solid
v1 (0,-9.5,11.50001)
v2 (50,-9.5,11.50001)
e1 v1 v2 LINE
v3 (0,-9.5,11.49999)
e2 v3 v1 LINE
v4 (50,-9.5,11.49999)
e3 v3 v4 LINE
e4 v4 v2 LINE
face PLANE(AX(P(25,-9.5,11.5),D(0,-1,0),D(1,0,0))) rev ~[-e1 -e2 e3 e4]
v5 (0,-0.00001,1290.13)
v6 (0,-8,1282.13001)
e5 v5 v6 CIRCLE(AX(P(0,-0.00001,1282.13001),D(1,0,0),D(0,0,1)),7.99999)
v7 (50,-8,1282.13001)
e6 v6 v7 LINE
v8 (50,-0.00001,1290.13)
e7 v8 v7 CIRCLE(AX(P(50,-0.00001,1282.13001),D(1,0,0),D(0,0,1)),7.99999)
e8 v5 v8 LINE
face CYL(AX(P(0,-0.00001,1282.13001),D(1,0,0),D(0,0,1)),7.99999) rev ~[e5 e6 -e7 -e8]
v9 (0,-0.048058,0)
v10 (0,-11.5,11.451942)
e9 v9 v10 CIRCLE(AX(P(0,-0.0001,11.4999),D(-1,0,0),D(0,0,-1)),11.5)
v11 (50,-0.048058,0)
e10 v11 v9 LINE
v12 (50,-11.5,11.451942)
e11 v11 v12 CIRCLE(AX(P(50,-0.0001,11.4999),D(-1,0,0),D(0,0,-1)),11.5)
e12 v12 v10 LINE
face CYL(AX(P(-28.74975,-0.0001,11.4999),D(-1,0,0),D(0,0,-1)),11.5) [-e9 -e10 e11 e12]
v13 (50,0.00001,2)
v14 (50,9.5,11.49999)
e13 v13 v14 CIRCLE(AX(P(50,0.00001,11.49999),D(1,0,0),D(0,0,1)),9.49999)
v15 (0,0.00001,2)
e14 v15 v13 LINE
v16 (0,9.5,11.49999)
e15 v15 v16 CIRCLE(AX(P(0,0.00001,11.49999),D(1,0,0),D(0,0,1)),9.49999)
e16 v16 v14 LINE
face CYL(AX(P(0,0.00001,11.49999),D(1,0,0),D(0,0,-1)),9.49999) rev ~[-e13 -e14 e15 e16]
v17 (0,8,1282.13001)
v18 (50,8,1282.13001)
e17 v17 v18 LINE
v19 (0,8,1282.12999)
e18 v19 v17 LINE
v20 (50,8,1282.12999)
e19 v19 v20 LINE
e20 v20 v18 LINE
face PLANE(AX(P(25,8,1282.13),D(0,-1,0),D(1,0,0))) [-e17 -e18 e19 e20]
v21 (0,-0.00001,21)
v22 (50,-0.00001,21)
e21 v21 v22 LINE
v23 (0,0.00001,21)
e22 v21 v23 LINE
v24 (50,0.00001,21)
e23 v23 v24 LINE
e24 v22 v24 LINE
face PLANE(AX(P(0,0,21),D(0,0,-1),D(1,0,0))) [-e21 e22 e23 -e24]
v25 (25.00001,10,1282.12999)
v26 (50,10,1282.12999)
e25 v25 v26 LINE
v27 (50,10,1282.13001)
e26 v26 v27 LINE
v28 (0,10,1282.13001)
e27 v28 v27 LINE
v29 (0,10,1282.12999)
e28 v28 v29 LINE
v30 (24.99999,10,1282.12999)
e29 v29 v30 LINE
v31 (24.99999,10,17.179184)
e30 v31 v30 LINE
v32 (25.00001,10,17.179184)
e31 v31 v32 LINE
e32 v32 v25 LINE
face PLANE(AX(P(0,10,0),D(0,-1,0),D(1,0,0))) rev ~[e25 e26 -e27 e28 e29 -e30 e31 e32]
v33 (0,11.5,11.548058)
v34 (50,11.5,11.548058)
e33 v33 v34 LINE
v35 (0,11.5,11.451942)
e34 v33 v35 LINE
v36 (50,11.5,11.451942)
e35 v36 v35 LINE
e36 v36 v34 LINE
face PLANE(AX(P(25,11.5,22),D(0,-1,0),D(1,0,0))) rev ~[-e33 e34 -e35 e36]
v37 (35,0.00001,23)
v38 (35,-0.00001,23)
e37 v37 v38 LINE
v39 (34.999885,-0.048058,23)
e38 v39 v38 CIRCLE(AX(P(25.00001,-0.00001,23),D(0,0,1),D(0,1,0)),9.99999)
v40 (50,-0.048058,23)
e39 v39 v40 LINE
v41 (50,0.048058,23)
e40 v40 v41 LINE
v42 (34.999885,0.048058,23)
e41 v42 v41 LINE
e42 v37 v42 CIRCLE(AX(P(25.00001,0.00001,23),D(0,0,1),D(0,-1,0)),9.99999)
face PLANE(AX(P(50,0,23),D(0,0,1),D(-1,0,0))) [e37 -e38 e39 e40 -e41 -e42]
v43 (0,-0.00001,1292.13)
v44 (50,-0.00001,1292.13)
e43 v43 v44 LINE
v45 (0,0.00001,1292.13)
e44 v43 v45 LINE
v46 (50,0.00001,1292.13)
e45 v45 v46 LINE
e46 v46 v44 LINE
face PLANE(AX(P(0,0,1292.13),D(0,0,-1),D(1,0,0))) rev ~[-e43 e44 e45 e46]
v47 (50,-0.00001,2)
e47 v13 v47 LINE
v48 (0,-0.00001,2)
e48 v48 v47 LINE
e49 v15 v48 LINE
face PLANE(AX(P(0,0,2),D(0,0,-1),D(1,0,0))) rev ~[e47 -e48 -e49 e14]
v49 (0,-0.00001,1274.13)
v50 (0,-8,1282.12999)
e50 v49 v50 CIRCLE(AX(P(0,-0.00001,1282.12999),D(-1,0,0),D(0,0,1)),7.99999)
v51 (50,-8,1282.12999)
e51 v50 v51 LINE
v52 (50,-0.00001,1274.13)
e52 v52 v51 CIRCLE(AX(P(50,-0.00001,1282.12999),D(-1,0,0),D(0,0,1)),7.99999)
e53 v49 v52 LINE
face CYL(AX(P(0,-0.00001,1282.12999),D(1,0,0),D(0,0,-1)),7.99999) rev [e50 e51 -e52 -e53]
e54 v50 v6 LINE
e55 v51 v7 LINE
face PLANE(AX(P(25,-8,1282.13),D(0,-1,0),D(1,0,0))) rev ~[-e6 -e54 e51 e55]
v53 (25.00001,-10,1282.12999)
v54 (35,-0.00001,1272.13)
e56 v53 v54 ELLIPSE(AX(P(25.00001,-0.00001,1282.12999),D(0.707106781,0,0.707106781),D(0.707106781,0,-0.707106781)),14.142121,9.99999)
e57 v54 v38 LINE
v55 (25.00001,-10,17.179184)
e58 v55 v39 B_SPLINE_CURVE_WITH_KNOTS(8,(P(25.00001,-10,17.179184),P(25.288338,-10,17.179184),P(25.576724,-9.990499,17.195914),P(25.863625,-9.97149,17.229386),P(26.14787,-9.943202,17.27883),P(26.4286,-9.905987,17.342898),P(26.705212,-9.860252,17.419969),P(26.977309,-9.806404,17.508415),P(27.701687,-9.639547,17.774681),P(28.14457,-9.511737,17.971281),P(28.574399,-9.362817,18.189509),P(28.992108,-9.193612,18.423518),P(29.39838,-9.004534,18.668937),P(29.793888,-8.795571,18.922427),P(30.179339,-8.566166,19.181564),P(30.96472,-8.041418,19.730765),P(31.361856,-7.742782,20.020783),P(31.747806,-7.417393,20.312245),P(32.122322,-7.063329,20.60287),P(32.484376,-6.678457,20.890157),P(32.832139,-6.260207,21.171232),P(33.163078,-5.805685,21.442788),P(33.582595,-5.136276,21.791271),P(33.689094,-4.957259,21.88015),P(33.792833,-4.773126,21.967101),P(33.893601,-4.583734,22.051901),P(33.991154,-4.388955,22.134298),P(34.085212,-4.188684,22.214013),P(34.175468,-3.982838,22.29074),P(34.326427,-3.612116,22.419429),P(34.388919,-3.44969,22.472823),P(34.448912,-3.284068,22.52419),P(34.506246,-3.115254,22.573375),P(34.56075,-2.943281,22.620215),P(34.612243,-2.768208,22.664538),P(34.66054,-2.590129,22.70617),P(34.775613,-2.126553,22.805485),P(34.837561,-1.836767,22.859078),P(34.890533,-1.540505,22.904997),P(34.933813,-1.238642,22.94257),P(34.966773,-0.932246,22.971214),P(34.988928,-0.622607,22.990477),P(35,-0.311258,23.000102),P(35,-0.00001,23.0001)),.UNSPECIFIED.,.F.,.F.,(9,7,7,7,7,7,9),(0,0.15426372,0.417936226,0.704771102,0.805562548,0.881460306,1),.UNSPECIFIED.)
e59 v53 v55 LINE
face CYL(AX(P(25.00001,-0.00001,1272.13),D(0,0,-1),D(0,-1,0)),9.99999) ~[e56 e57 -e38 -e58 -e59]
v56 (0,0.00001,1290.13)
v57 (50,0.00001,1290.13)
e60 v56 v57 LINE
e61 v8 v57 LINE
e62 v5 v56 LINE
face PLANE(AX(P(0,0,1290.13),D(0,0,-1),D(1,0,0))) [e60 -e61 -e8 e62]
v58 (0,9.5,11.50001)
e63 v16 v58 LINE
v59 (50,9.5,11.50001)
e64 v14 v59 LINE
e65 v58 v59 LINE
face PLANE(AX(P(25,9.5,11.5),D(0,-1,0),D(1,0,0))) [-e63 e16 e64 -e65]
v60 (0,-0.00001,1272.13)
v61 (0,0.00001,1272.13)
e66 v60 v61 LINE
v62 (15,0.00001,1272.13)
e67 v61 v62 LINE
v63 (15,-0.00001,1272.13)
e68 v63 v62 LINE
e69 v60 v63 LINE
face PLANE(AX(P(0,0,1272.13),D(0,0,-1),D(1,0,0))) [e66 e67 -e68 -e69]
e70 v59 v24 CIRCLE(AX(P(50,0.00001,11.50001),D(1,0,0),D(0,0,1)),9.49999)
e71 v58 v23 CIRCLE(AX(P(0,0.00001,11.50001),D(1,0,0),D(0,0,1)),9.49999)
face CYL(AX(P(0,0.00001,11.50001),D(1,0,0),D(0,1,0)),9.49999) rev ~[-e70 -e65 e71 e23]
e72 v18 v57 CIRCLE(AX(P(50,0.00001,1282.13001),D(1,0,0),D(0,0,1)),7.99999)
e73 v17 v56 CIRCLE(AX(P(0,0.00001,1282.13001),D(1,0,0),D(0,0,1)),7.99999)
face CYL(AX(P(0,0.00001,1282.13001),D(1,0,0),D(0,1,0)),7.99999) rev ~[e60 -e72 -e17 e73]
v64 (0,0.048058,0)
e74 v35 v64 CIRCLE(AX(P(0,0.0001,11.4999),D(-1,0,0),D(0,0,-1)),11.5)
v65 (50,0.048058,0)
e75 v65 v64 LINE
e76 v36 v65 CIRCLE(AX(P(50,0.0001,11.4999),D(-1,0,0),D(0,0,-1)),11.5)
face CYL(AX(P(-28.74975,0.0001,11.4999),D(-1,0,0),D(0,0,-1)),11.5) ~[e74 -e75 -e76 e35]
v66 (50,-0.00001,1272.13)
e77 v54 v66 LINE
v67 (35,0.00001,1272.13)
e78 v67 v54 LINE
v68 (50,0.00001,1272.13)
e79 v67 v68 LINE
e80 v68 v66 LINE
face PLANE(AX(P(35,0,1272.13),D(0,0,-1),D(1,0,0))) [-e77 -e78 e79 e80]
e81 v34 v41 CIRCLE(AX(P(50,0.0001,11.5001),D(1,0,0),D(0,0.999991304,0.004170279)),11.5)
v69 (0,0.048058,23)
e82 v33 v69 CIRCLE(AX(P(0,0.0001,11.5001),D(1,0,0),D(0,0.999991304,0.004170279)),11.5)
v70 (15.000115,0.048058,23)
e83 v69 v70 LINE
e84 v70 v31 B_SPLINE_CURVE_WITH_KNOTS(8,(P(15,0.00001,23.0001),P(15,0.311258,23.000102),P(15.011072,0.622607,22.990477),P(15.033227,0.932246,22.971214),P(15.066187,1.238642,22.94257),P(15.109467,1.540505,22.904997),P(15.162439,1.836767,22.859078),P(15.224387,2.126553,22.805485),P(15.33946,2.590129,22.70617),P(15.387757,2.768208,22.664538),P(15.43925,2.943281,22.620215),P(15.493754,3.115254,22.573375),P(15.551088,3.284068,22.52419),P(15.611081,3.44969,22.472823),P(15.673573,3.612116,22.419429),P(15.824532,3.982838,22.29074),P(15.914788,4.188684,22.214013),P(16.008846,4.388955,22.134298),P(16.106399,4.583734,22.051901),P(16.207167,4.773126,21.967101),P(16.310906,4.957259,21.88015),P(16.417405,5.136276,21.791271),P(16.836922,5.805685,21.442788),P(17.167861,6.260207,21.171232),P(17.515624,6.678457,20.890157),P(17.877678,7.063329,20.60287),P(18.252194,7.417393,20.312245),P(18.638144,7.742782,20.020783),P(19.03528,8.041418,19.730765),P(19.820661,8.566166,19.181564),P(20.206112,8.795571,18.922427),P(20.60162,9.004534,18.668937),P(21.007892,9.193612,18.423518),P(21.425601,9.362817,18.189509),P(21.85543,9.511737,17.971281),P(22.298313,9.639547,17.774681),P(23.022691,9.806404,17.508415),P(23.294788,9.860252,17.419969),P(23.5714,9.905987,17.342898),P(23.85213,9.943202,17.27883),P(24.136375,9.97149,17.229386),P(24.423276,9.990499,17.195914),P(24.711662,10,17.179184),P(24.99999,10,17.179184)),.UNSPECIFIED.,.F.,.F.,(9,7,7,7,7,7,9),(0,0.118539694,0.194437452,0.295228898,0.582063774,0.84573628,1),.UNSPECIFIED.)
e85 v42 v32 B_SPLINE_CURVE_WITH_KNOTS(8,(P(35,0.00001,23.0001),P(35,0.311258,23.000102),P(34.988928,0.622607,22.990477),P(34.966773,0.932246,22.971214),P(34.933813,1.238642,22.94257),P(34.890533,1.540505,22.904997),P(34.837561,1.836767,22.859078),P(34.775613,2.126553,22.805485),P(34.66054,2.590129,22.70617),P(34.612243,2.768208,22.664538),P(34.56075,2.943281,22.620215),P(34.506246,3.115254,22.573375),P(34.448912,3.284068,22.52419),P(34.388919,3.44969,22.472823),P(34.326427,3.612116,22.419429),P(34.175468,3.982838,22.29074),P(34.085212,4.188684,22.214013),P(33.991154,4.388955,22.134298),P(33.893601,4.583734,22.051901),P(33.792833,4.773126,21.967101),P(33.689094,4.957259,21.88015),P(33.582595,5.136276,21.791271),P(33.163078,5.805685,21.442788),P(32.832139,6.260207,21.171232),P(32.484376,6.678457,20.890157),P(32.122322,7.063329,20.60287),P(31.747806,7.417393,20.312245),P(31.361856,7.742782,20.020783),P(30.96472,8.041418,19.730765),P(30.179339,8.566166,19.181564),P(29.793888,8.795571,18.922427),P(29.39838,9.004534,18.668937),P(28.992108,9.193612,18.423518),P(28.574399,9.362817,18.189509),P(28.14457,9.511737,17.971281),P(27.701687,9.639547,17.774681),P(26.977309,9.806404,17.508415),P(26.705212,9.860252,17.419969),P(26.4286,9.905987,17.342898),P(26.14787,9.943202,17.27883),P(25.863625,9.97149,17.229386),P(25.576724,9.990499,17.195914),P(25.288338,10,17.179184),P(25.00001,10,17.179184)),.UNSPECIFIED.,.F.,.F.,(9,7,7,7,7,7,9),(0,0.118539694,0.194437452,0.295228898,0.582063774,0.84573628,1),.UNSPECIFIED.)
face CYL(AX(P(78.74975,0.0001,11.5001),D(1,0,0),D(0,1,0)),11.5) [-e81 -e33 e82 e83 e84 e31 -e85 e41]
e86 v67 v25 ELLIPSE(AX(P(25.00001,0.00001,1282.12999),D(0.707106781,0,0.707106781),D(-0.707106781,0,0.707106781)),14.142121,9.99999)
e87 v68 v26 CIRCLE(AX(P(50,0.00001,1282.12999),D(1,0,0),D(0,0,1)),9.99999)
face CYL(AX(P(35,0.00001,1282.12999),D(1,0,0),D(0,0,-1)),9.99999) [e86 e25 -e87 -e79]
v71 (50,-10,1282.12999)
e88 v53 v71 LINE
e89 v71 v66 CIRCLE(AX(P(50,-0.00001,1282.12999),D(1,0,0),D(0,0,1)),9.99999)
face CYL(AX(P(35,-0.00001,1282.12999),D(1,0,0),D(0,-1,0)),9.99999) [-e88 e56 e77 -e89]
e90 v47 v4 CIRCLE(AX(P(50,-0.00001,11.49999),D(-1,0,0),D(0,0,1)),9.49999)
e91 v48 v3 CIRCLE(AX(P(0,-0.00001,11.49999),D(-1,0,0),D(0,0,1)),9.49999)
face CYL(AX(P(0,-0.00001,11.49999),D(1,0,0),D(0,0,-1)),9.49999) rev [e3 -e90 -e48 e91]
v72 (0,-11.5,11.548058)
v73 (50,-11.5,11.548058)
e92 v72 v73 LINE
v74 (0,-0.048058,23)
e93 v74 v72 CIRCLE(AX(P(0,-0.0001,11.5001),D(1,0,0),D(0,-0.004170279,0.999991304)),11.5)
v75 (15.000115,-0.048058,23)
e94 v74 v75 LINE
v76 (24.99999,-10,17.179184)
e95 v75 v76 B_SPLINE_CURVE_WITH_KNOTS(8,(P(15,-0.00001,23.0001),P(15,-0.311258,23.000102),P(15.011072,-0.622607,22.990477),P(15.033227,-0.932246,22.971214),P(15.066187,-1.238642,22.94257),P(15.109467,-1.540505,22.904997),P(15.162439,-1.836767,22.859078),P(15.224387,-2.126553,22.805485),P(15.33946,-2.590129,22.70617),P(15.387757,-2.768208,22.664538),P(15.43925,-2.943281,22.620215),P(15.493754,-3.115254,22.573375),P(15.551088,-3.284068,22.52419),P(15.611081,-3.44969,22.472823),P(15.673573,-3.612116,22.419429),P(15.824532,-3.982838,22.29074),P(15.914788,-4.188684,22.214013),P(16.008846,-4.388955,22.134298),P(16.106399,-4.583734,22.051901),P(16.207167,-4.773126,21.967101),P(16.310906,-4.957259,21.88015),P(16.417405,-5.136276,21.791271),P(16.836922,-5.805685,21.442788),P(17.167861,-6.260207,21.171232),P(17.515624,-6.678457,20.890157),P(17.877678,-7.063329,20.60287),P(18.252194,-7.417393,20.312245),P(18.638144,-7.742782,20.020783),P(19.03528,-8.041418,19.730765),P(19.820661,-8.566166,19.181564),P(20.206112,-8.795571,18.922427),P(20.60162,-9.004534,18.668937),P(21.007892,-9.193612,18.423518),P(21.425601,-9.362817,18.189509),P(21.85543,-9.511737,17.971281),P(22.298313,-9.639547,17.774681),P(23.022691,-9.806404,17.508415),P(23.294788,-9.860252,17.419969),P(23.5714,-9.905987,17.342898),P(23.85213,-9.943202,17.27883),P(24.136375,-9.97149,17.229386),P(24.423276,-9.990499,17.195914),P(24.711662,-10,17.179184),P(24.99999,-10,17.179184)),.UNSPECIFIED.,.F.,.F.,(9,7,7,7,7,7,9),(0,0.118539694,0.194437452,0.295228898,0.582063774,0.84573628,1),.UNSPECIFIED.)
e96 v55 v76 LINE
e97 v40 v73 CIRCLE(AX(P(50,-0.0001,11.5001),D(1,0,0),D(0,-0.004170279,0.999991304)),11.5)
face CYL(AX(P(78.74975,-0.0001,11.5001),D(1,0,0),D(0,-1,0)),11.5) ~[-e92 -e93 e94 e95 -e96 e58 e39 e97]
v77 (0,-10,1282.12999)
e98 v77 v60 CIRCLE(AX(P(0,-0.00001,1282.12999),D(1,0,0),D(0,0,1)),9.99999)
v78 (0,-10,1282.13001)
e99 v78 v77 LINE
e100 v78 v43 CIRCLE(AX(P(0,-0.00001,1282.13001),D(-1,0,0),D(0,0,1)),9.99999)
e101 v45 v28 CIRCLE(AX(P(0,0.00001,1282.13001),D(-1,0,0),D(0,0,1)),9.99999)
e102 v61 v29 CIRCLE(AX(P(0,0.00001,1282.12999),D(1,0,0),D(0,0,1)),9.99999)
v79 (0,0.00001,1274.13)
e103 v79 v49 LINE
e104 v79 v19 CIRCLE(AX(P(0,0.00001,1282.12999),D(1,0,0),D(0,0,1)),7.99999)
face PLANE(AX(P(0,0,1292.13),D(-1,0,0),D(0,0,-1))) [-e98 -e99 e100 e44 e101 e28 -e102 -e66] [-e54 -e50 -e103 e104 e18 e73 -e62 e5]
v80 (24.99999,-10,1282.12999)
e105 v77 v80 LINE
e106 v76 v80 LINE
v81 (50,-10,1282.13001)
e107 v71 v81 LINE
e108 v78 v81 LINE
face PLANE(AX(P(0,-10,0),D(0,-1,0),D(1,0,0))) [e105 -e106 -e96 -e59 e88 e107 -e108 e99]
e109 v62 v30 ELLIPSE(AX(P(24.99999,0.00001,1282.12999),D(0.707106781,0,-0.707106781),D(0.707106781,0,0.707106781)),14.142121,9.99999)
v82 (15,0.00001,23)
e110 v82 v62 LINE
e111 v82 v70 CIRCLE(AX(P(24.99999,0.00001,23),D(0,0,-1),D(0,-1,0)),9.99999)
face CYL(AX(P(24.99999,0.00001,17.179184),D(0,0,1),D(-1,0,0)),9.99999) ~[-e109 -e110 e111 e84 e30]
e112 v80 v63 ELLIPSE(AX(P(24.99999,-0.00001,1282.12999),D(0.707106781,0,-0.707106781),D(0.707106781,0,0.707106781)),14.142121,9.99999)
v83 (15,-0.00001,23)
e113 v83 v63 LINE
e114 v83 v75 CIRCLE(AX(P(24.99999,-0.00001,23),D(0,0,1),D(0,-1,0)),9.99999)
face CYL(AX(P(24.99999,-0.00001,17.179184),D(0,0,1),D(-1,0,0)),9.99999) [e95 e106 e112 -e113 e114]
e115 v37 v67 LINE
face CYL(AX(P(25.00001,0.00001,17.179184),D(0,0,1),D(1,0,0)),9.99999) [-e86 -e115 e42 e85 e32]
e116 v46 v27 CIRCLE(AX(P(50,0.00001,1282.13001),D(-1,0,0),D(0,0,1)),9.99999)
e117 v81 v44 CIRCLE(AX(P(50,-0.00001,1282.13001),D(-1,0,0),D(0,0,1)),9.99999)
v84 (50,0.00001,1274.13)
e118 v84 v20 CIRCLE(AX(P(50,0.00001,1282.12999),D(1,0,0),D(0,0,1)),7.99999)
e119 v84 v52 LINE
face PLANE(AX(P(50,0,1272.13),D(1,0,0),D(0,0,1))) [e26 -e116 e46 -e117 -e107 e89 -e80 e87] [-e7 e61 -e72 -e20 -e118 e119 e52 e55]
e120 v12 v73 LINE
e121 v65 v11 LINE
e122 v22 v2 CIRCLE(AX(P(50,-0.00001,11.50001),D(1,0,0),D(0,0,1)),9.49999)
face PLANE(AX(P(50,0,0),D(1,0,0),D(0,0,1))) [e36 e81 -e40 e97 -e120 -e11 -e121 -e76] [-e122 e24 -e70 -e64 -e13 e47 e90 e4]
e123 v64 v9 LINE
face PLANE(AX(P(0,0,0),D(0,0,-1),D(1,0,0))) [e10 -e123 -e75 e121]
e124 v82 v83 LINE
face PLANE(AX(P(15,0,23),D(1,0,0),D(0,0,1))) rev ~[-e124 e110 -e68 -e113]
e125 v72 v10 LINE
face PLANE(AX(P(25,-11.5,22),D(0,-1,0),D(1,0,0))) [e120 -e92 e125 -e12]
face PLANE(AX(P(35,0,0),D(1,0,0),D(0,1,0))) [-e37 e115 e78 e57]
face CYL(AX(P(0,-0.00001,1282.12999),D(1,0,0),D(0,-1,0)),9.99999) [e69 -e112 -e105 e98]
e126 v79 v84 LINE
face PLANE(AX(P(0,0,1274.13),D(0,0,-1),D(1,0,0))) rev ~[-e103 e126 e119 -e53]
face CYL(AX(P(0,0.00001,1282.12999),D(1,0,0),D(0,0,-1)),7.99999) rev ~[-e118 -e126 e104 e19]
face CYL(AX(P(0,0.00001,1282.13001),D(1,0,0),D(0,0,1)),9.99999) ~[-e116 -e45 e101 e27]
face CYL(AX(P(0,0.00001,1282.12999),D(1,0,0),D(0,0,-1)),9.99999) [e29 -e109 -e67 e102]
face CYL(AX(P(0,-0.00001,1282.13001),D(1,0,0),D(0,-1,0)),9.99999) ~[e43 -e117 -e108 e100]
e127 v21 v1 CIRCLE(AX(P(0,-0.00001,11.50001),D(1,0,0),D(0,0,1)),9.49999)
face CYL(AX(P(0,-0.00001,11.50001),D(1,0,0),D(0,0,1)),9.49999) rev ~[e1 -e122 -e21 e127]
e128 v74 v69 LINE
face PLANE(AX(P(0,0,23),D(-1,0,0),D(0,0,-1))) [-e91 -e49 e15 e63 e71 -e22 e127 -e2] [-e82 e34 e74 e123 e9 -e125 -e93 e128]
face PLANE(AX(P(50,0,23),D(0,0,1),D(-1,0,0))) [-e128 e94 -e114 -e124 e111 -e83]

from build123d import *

# Parameters (mm, degrees)
F0_W         = 20
F0_H         = 1249.13
F0_W_2       = 50
F0_H_2       = 16
F0_H_3       = 2
F1_DEPTH     = 10
F0_H_4       = 19
F2_DEPTH     = 11.5
F3_DEPTH     = 9.5
F4_DEPTH     = 8
F5_R         = 7.99999
F6_R         = 9.49999
F7_T1_DEPTH  = 107.4995000022
F7_T6_DEPTH  = 107.4995000022
F7_T12_DEPTH = 107.4995000022
F7_T18_DEPTH = 107.4995000022
F7_T25_DEPTH = 107.4995000022
F7_T31_DEPTH = 107.4995000022
F7_T37_DEPTH = 107.4995000022
F7_T43_DEPTH = 107.4995000022
F7_T49_DEPTH = 107.4995000022
F7_T56_DEPTH = 107.4995000022
F7_T62_DEPTH = 107.4995000022
F8_R         = 9.99999


# Not quite as in the source:
# - a fillet or chamfer that OpenCascade refuses, or shapes differently, is made with other operations: its cross-section is extruded or revolved along the edge and cut away or added
# - a fillet or chamfer is up to 0.001 mm smaller than in the source, because OpenCascade refuses the exact size


with BuildPart() as f1:
    # F0 (on Front) → F1 (new body, symmetric)
    with BuildSketch(Plane.XZ):
        with Locations((25, 647.565)):
            Rectangle(F0_W, F0_H)
        Polygon((0, 1272.13), (15, 1272.13), (35, 1272.13), (50, 1272.13), (50, 1274.13), (0, 1274.13), align=None)
        with Locations((25, 1282.13)):
            Rectangle(F0_W_2, F0_H_2)
        with Locations((25, 1291.13)):
            Rectangle(F0_W_2, F0_H_3)
    extrude(amount=F1_DEPTH, both=True)

    # F0 (on Front) → F2 (join, symmetric)
    with BuildSketch(Plane.XZ):
        Polygon((0, 23), (0, 21), (50, 21), (50, 23), (35, 23), (15, 23), align=None)
        with Locations((25, 11.5)):
            Rectangle(F0_W_2, F0_H_4)
        with Locations((25, 1)):
            Rectangle(F0_W_2, F0_H_3)
    extrude(amount=F2_DEPTH, both=True)

    # F0 (on Front) → F3 (cut, symmetric)
    with BuildSketch(Plane.XZ):
        with Locations((25, 11.5)):
            Rectangle(F0_W_2, F0_H_4)
    extrude(amount=F3_DEPTH, both=True, mode=Mode.SUBTRACT)

    # F0 (on Front) → F4 (cut, symmetric)
    with BuildSketch(Plane.XZ):
        with Locations((25, 1282.13)):
            Rectangle(F0_W_2, F0_H_2)
    extrude(amount=F4_DEPTH, both=True, mode=Mode.SUBTRACT)

    # F5 (radius 8 in the source; OpenCascade refuses exactly that, so slightly less here)
    f5_edges = [f1.edges().sort_by_distance(p)[0] for p in [
        (25, -8, 1290.13),
        (25, -8, 1274.13),
        (25, 8, 1274.13),
        (25, 8, 1290.13),
    ]]
    fillet(f5_edges, radius=F5_R)

    # F6 (radius 9.5 in the source; OpenCascade refuses exactly that, so slightly less here)
    f6_edges = [f1.edges().sort_by_distance(p)[0] for p in [
        (25, 9.5, 2),
        (25, -9.5, 2),
        (25, -9.5, 21),
        (25, 9.5, 21),
    ]]
    fillet(f6_edges, radius=F6_R)

    # F7: fillet of radius 11.5 on 4 edges, made by hand

    # F7_s2 → F7_t1 (cut)
    with BuildSketch(Plane.YZ.offset(-28.7497500011)):
        with BuildLine():
            ThreePointArc((-0.0001, -0.0001), (-8.1318279836, 3.3681720164), (-11.5001, 11.4999))
            Line((-11.5001, 11.4999), (-11.7301, 11.4999))
            ThreePointArc((-11.7301, 11.4999), (-11.73, 5.74995), (-11.73, 0))
            Line((-11.73, 0), (-11.5, -0.23))
            ThreePointArc((-11.5, -0.23), (-5.75005, -0.23), (-0.0001, -0.2301))
            Line((-0.0001, -0.2301), (-0.0001, -0.0001))
        make_face()
        with BuildLine():
            ThreePointArc((0.0001, -0.0001), (8.1318279836, 3.3681720164), (11.5001, 11.4999))
            Line((11.5001, 11.4999), (11.7301, 11.4999))
            ThreePointArc((11.7301, 11.4999), (11.73, 5.74995), (11.73, 0))
            Line((11.73, 0), (11.5, -0.23))
            ThreePointArc((11.5, -0.23), (5.75005, -0.23), (0.0001, -0.2301))
            Line((0.0001, -0.2301), (0.0001, -0.0001))
        make_face()
    extrude(amount=F7_T1_DEPTH, mode=Mode.SUBTRACT)


with BuildPart() as f7_tool4:
    # F7_s5 → F7_t6 (new body)
    with BuildSketch(Plane.YZ.offset(78.7497500011)):
        with BuildLine():
            ThreePointArc((-11.5001, 11.5001), (-8.1318279836, 19.6318279836), (-0.0001, 23.0001))
            Line((-0.0001, 23.0001), (-0.0001, 23.2301))
            ThreePointArc((-0.0001, 23.2301), (-5.75005, 23.23), (-11.5, 23.23))
            Line((-11.5, 23.23), (-11.73, 23))
            ThreePointArc((-11.73, 23), (-11.73, 17.25005), (-11.7301, 11.5001))
            Line((-11.7301, 11.5001), (-11.5001, 11.5001))
        make_face()
    extrude(amount=-F7_T6_DEPTH)

    split(bisect_by=Plane.XZ.offset(10), keep=Keep.TOP)

    split(bisect_by=Plane.YZ.offset(35), keep=Keep.TOP)


with BuildPart() as f1_1:
    add(f1.part)

    # F7_t3: cut F7_tool4
    add(f7_tool4.part, mode=Mode.SUBTRACT)


with BuildPart() as f7_tool10:
    # F7_s11 → F7_t12 (new body)
    with BuildSketch(Plane.YZ.offset(78.7497500011)):
        with BuildLine():
            ThreePointArc((-11.5001, 11.5001), (-8.1318279836, 19.6318279836), (-0.0001, 23.0001))
            Line((-0.0001, 23.0001), (-0.0001, 23.2301))
            ThreePointArc((-0.0001, 23.2301), (-5.75005, 23.23), (-11.5, 23.23))
            Line((-11.5, 23.23), (-11.73, 23))
            ThreePointArc((-11.73, 23), (-11.73, 17.25005), (-11.7301, 11.5001))
            Line((-11.7301, 11.5001), (-11.5001, 11.5001))
        make_face()
    extrude(amount=-F7_T12_DEPTH)

    split(bisect_by=Plane.XZ.offset(10), keep=Keep.BOTTOM)

    split(bisect_by=Plane.YZ.offset(35), keep=Keep.TOP)


with BuildPart() as f1_2:
    add(f1_1.part)

    # F7_t9: cut F7_tool10
    add(f7_tool10.part, mode=Mode.SUBTRACT)


with BuildPart() as f7_tool16:
    # F7_s17 → F7_t18 (new body)
    with BuildSketch(Plane.YZ.offset(78.7497500011)):
        with BuildLine():
            ThreePointArc((-11.5001, 11.5001), (-8.1318279836, 19.6318279836), (-0.0001, 23.0001))
            Line((-0.0001, 23.0001), (-0.0001, 23.2301))
            ThreePointArc((-0.0001, 23.2301), (-5.75005, 23.23), (-11.5, 23.23))
            Line((-11.5, 23.23), (-11.73, 23))
            ThreePointArc((-11.73, 23), (-11.73, 17.25005), (-11.7301, 11.5001))
            Line((-11.7301, 11.5001), (-11.5001, 11.5001))
        make_face()
    extrude(amount=-F7_T18_DEPTH)

    split(bisect_by=Plane.YZ.offset(15), keep=Keep.TOP)

    split(bisect_by=Plane.XZ.offset(10), keep=Keep.TOP)

    split(bisect_by=Plane.YZ.offset(35), keep=Keep.BOTTOM)


with BuildPart() as f1_3:
    add(f1_2.part)

    # F7_t15: cut F7_tool16
    add(f7_tool16.part, mode=Mode.SUBTRACT)


with BuildPart() as f7_tool23:
    # F7_s24 → F7_t25 (new body)
    with BuildSketch(Plane.YZ.offset(78.7497500011)):
        with BuildLine():
            ThreePointArc((-11.5001, 11.5001), (-8.1318279836, 19.6318279836), (-0.0001, 23.0001))
            Line((-0.0001, 23.0001), (-0.0001, 23.2301))
            ThreePointArc((-0.0001, 23.2301), (-5.75005, 23.23), (-11.5, 23.23))
            Line((-11.5, 23.23), (-11.73, 23))
            ThreePointArc((-11.73, 23), (-11.73, 17.25005), (-11.7301, 11.5001))
            Line((-11.7301, 11.5001), (-11.5001, 11.5001))
        make_face()
    extrude(amount=-F7_T25_DEPTH)

    split(bisect_by=Plane.YZ.offset(15), keep=Keep.BOTTOM)

    split(bisect_by=Plane.XZ.offset(10), keep=Keep.TOP)


with BuildPart() as f1_4:
    add(f1_3.part)

    # F7_t22: cut F7_tool23
    add(f7_tool23.part, mode=Mode.SUBTRACT)


with BuildPart() as f7_tool29:
    # F7_s30 → F7_t31 (new body)
    with BuildSketch(Plane.YZ.offset(78.7497500011)):
        with BuildLine():
            ThreePointArc((-11.5001, 11.5001), (-8.1318279836, 19.6318279836), (-0.0001, 23.0001))
            Line((-0.0001, 23.0001), (-0.0001, 23.2301))
            ThreePointArc((-0.0001, 23.2301), (-5.75005, 23.23), (-11.5, 23.23))
            Line((-11.5, 23.23), (-11.73, 23))
            ThreePointArc((-11.73, 23), (-11.73, 17.25005), (-11.7301, 11.5001))
            Line((-11.7301, 11.5001), (-11.5001, 11.5001))
        make_face()
    extrude(amount=-F7_T31_DEPTH)

    split(bisect_by=Plane.YZ.offset(15), keep=Keep.BOTTOM)

    split(bisect_by=Plane.XZ.offset(10), keep=Keep.BOTTOM)


with BuildPart() as f1_5:
    add(f1_4.part)

    # F7_t28: cut F7_tool29
    add(f7_tool29.part, mode=Mode.SUBTRACT)


with BuildPart() as f7_tool35:
    # F7_s36 → F7_t37 (new body)
    with BuildSketch(Plane.YZ.offset(78.7497500011)):
        with BuildLine():
            ThreePointArc((11.5001, 11.5001), (8.1318279836, 19.6318279836), (0.0001, 23.0001))
            Line((0.0001, 23.0001), (0.0001, 23.2301))
            ThreePointArc((0.0001, 23.2301), (5.75005, 23.23), (11.5, 23.23))
            Line((11.5, 23.23), (11.73, 23))
            ThreePointArc((11.73, 23), (11.73, 17.25005), (11.7301, 11.5001))
            Line((11.7301, 11.5001), (11.5001, 11.5001))
        make_face()
    extrude(amount=-F7_T37_DEPTH)

    split(bisect_by=Plane.YZ.offset(35), keep=Keep.TOP)

    split(bisect_by=Plane.XZ.offset(-10), keep=Keep.BOTTOM)


with BuildPart() as f1_6:
    add(f1_5.part)

    # F7_t34: cut F7_tool35
    add(f7_tool35.part, mode=Mode.SUBTRACT)


with BuildPart() as f7_tool41:
    # F7_s42 → F7_t43 (new body)
    with BuildSketch(Plane.YZ.offset(78.7497500011)):
        with BuildLine():
            ThreePointArc((11.5001, 11.5001), (8.1318279836, 19.6318279836), (0.0001, 23.0001))
            Line((0.0001, 23.0001), (0.0001, 23.2301))
            ThreePointArc((0.0001, 23.2301), (5.75005, 23.23), (11.5, 23.23))
            Line((11.5, 23.23), (11.73, 23))
            ThreePointArc((11.73, 23), (11.73, 17.25005), (11.7301, 11.5001))
            Line((11.7301, 11.5001), (11.5001, 11.5001))
        make_face()
    extrude(amount=-F7_T43_DEPTH)

    split(bisect_by=Plane.YZ.offset(35), keep=Keep.TOP)

    split(bisect_by=Plane.XZ.offset(-10), keep=Keep.TOP)


with BuildPart() as f1_7:
    add(f1_6.part)

    # F7_t40: cut F7_tool41
    add(f7_tool41.part, mode=Mode.SUBTRACT)


with BuildPart() as f7_tool47:
    # F7_s48 → F7_t49 (new body)
    with BuildSketch(Plane.YZ.offset(78.7497500011)):
        with BuildLine():
            ThreePointArc((11.5001, 11.5001), (8.1318279836, 19.6318279836), (0.0001, 23.0001))
            Line((0.0001, 23.0001), (0.0001, 23.2301))
            ThreePointArc((0.0001, 23.2301), (5.75005, 23.23), (11.5, 23.23))
            Line((11.5, 23.23), (11.73, 23))
            ThreePointArc((11.73, 23), (11.73, 17.25005), (11.7301, 11.5001))
            Line((11.7301, 11.5001), (11.5001, 11.5001))
        make_face()
    extrude(amount=-F7_T49_DEPTH)

    split(bisect_by=Plane.YZ.offset(15), keep=Keep.TOP)

    split(bisect_by=Plane.YZ.offset(35), keep=Keep.BOTTOM)

    split(bisect_by=Plane.XZ.offset(-10), keep=Keep.BOTTOM)


with BuildPart() as f1_8:
    add(f1_7.part)

    # F7_t46: cut F7_tool47
    add(f7_tool47.part, mode=Mode.SUBTRACT)


with BuildPart() as f7_tool54:
    # F7_s55 → F7_t56 (new body)
    with BuildSketch(Plane.YZ.offset(78.7497500011)):
        with BuildLine():
            ThreePointArc((11.5001, 11.5001), (8.1318279836, 19.6318279836), (0.0001, 23.0001))
            Line((0.0001, 23.0001), (0.0001, 23.2301))
            ThreePointArc((0.0001, 23.2301), (5.75005, 23.23), (11.5, 23.23))
            Line((11.5, 23.23), (11.73, 23))
            ThreePointArc((11.73, 23), (11.73, 17.25005), (11.7301, 11.5001))
            Line((11.7301, 11.5001), (11.5001, 11.5001))
        make_face()
    extrude(amount=-F7_T56_DEPTH)

    split(bisect_by=Plane.YZ.offset(15), keep=Keep.BOTTOM)

    split(bisect_by=Plane.XZ.offset(-10), keep=Keep.BOTTOM)


with BuildPart() as f1_9:
    add(f1_8.part)

    # F7_t53: cut F7_tool54
    add(f7_tool54.part, mode=Mode.SUBTRACT)


with BuildPart() as f7_tool60:
    # F7_s61 → F7_t62 (new body)
    with BuildSketch(Plane.YZ.offset(78.7497500011)):
        with BuildLine():
            ThreePointArc((11.5001, 11.5001), (8.1318279836, 19.6318279836), (0.0001, 23.0001))
            Line((0.0001, 23.0001), (0.0001, 23.2301))
            ThreePointArc((0.0001, 23.2301), (5.75005, 23.23), (11.5, 23.23))
            Line((11.5, 23.23), (11.73, 23))
            ThreePointArc((11.73, 23), (11.73, 17.25005), (11.7301, 11.5001))
            Line((11.7301, 11.5001), (11.5001, 11.5001))
        make_face()
    extrude(amount=-F7_T62_DEPTH)

    split(bisect_by=Plane.YZ.offset(15), keep=Keep.BOTTOM)

    split(bisect_by=Plane.XZ.offset(-10), keep=Keep.TOP)


with BuildPart() as f1_10:
    add(f1_9.part)

    # F7_t59: cut F7_tool60
    add(f7_tool60.part, mode=Mode.SUBTRACT)

    # F8 (radius 10 in the source; OpenCascade refuses exactly that, so slightly less here)
    f8_edges = [f1_10.edges().sort_by_distance(p)[0] for p in [
        (7.5, -10, 1272.13),
        (25, -10, 1292.13),
        (42.5, -10, 1272.13),
        (35, -10, 644.654592),
        (15, -10, 644.654592),
        (35, 10, 644.654592),
        (42.5, 10, 1272.13),
        (25, 10, 1292.13),
        (15, 10, 644.654592),
        (7.5, 10, 1272.13),
    ]]
    fillet(f8_edges, radius=F8_R)


solid = f1_10.part
